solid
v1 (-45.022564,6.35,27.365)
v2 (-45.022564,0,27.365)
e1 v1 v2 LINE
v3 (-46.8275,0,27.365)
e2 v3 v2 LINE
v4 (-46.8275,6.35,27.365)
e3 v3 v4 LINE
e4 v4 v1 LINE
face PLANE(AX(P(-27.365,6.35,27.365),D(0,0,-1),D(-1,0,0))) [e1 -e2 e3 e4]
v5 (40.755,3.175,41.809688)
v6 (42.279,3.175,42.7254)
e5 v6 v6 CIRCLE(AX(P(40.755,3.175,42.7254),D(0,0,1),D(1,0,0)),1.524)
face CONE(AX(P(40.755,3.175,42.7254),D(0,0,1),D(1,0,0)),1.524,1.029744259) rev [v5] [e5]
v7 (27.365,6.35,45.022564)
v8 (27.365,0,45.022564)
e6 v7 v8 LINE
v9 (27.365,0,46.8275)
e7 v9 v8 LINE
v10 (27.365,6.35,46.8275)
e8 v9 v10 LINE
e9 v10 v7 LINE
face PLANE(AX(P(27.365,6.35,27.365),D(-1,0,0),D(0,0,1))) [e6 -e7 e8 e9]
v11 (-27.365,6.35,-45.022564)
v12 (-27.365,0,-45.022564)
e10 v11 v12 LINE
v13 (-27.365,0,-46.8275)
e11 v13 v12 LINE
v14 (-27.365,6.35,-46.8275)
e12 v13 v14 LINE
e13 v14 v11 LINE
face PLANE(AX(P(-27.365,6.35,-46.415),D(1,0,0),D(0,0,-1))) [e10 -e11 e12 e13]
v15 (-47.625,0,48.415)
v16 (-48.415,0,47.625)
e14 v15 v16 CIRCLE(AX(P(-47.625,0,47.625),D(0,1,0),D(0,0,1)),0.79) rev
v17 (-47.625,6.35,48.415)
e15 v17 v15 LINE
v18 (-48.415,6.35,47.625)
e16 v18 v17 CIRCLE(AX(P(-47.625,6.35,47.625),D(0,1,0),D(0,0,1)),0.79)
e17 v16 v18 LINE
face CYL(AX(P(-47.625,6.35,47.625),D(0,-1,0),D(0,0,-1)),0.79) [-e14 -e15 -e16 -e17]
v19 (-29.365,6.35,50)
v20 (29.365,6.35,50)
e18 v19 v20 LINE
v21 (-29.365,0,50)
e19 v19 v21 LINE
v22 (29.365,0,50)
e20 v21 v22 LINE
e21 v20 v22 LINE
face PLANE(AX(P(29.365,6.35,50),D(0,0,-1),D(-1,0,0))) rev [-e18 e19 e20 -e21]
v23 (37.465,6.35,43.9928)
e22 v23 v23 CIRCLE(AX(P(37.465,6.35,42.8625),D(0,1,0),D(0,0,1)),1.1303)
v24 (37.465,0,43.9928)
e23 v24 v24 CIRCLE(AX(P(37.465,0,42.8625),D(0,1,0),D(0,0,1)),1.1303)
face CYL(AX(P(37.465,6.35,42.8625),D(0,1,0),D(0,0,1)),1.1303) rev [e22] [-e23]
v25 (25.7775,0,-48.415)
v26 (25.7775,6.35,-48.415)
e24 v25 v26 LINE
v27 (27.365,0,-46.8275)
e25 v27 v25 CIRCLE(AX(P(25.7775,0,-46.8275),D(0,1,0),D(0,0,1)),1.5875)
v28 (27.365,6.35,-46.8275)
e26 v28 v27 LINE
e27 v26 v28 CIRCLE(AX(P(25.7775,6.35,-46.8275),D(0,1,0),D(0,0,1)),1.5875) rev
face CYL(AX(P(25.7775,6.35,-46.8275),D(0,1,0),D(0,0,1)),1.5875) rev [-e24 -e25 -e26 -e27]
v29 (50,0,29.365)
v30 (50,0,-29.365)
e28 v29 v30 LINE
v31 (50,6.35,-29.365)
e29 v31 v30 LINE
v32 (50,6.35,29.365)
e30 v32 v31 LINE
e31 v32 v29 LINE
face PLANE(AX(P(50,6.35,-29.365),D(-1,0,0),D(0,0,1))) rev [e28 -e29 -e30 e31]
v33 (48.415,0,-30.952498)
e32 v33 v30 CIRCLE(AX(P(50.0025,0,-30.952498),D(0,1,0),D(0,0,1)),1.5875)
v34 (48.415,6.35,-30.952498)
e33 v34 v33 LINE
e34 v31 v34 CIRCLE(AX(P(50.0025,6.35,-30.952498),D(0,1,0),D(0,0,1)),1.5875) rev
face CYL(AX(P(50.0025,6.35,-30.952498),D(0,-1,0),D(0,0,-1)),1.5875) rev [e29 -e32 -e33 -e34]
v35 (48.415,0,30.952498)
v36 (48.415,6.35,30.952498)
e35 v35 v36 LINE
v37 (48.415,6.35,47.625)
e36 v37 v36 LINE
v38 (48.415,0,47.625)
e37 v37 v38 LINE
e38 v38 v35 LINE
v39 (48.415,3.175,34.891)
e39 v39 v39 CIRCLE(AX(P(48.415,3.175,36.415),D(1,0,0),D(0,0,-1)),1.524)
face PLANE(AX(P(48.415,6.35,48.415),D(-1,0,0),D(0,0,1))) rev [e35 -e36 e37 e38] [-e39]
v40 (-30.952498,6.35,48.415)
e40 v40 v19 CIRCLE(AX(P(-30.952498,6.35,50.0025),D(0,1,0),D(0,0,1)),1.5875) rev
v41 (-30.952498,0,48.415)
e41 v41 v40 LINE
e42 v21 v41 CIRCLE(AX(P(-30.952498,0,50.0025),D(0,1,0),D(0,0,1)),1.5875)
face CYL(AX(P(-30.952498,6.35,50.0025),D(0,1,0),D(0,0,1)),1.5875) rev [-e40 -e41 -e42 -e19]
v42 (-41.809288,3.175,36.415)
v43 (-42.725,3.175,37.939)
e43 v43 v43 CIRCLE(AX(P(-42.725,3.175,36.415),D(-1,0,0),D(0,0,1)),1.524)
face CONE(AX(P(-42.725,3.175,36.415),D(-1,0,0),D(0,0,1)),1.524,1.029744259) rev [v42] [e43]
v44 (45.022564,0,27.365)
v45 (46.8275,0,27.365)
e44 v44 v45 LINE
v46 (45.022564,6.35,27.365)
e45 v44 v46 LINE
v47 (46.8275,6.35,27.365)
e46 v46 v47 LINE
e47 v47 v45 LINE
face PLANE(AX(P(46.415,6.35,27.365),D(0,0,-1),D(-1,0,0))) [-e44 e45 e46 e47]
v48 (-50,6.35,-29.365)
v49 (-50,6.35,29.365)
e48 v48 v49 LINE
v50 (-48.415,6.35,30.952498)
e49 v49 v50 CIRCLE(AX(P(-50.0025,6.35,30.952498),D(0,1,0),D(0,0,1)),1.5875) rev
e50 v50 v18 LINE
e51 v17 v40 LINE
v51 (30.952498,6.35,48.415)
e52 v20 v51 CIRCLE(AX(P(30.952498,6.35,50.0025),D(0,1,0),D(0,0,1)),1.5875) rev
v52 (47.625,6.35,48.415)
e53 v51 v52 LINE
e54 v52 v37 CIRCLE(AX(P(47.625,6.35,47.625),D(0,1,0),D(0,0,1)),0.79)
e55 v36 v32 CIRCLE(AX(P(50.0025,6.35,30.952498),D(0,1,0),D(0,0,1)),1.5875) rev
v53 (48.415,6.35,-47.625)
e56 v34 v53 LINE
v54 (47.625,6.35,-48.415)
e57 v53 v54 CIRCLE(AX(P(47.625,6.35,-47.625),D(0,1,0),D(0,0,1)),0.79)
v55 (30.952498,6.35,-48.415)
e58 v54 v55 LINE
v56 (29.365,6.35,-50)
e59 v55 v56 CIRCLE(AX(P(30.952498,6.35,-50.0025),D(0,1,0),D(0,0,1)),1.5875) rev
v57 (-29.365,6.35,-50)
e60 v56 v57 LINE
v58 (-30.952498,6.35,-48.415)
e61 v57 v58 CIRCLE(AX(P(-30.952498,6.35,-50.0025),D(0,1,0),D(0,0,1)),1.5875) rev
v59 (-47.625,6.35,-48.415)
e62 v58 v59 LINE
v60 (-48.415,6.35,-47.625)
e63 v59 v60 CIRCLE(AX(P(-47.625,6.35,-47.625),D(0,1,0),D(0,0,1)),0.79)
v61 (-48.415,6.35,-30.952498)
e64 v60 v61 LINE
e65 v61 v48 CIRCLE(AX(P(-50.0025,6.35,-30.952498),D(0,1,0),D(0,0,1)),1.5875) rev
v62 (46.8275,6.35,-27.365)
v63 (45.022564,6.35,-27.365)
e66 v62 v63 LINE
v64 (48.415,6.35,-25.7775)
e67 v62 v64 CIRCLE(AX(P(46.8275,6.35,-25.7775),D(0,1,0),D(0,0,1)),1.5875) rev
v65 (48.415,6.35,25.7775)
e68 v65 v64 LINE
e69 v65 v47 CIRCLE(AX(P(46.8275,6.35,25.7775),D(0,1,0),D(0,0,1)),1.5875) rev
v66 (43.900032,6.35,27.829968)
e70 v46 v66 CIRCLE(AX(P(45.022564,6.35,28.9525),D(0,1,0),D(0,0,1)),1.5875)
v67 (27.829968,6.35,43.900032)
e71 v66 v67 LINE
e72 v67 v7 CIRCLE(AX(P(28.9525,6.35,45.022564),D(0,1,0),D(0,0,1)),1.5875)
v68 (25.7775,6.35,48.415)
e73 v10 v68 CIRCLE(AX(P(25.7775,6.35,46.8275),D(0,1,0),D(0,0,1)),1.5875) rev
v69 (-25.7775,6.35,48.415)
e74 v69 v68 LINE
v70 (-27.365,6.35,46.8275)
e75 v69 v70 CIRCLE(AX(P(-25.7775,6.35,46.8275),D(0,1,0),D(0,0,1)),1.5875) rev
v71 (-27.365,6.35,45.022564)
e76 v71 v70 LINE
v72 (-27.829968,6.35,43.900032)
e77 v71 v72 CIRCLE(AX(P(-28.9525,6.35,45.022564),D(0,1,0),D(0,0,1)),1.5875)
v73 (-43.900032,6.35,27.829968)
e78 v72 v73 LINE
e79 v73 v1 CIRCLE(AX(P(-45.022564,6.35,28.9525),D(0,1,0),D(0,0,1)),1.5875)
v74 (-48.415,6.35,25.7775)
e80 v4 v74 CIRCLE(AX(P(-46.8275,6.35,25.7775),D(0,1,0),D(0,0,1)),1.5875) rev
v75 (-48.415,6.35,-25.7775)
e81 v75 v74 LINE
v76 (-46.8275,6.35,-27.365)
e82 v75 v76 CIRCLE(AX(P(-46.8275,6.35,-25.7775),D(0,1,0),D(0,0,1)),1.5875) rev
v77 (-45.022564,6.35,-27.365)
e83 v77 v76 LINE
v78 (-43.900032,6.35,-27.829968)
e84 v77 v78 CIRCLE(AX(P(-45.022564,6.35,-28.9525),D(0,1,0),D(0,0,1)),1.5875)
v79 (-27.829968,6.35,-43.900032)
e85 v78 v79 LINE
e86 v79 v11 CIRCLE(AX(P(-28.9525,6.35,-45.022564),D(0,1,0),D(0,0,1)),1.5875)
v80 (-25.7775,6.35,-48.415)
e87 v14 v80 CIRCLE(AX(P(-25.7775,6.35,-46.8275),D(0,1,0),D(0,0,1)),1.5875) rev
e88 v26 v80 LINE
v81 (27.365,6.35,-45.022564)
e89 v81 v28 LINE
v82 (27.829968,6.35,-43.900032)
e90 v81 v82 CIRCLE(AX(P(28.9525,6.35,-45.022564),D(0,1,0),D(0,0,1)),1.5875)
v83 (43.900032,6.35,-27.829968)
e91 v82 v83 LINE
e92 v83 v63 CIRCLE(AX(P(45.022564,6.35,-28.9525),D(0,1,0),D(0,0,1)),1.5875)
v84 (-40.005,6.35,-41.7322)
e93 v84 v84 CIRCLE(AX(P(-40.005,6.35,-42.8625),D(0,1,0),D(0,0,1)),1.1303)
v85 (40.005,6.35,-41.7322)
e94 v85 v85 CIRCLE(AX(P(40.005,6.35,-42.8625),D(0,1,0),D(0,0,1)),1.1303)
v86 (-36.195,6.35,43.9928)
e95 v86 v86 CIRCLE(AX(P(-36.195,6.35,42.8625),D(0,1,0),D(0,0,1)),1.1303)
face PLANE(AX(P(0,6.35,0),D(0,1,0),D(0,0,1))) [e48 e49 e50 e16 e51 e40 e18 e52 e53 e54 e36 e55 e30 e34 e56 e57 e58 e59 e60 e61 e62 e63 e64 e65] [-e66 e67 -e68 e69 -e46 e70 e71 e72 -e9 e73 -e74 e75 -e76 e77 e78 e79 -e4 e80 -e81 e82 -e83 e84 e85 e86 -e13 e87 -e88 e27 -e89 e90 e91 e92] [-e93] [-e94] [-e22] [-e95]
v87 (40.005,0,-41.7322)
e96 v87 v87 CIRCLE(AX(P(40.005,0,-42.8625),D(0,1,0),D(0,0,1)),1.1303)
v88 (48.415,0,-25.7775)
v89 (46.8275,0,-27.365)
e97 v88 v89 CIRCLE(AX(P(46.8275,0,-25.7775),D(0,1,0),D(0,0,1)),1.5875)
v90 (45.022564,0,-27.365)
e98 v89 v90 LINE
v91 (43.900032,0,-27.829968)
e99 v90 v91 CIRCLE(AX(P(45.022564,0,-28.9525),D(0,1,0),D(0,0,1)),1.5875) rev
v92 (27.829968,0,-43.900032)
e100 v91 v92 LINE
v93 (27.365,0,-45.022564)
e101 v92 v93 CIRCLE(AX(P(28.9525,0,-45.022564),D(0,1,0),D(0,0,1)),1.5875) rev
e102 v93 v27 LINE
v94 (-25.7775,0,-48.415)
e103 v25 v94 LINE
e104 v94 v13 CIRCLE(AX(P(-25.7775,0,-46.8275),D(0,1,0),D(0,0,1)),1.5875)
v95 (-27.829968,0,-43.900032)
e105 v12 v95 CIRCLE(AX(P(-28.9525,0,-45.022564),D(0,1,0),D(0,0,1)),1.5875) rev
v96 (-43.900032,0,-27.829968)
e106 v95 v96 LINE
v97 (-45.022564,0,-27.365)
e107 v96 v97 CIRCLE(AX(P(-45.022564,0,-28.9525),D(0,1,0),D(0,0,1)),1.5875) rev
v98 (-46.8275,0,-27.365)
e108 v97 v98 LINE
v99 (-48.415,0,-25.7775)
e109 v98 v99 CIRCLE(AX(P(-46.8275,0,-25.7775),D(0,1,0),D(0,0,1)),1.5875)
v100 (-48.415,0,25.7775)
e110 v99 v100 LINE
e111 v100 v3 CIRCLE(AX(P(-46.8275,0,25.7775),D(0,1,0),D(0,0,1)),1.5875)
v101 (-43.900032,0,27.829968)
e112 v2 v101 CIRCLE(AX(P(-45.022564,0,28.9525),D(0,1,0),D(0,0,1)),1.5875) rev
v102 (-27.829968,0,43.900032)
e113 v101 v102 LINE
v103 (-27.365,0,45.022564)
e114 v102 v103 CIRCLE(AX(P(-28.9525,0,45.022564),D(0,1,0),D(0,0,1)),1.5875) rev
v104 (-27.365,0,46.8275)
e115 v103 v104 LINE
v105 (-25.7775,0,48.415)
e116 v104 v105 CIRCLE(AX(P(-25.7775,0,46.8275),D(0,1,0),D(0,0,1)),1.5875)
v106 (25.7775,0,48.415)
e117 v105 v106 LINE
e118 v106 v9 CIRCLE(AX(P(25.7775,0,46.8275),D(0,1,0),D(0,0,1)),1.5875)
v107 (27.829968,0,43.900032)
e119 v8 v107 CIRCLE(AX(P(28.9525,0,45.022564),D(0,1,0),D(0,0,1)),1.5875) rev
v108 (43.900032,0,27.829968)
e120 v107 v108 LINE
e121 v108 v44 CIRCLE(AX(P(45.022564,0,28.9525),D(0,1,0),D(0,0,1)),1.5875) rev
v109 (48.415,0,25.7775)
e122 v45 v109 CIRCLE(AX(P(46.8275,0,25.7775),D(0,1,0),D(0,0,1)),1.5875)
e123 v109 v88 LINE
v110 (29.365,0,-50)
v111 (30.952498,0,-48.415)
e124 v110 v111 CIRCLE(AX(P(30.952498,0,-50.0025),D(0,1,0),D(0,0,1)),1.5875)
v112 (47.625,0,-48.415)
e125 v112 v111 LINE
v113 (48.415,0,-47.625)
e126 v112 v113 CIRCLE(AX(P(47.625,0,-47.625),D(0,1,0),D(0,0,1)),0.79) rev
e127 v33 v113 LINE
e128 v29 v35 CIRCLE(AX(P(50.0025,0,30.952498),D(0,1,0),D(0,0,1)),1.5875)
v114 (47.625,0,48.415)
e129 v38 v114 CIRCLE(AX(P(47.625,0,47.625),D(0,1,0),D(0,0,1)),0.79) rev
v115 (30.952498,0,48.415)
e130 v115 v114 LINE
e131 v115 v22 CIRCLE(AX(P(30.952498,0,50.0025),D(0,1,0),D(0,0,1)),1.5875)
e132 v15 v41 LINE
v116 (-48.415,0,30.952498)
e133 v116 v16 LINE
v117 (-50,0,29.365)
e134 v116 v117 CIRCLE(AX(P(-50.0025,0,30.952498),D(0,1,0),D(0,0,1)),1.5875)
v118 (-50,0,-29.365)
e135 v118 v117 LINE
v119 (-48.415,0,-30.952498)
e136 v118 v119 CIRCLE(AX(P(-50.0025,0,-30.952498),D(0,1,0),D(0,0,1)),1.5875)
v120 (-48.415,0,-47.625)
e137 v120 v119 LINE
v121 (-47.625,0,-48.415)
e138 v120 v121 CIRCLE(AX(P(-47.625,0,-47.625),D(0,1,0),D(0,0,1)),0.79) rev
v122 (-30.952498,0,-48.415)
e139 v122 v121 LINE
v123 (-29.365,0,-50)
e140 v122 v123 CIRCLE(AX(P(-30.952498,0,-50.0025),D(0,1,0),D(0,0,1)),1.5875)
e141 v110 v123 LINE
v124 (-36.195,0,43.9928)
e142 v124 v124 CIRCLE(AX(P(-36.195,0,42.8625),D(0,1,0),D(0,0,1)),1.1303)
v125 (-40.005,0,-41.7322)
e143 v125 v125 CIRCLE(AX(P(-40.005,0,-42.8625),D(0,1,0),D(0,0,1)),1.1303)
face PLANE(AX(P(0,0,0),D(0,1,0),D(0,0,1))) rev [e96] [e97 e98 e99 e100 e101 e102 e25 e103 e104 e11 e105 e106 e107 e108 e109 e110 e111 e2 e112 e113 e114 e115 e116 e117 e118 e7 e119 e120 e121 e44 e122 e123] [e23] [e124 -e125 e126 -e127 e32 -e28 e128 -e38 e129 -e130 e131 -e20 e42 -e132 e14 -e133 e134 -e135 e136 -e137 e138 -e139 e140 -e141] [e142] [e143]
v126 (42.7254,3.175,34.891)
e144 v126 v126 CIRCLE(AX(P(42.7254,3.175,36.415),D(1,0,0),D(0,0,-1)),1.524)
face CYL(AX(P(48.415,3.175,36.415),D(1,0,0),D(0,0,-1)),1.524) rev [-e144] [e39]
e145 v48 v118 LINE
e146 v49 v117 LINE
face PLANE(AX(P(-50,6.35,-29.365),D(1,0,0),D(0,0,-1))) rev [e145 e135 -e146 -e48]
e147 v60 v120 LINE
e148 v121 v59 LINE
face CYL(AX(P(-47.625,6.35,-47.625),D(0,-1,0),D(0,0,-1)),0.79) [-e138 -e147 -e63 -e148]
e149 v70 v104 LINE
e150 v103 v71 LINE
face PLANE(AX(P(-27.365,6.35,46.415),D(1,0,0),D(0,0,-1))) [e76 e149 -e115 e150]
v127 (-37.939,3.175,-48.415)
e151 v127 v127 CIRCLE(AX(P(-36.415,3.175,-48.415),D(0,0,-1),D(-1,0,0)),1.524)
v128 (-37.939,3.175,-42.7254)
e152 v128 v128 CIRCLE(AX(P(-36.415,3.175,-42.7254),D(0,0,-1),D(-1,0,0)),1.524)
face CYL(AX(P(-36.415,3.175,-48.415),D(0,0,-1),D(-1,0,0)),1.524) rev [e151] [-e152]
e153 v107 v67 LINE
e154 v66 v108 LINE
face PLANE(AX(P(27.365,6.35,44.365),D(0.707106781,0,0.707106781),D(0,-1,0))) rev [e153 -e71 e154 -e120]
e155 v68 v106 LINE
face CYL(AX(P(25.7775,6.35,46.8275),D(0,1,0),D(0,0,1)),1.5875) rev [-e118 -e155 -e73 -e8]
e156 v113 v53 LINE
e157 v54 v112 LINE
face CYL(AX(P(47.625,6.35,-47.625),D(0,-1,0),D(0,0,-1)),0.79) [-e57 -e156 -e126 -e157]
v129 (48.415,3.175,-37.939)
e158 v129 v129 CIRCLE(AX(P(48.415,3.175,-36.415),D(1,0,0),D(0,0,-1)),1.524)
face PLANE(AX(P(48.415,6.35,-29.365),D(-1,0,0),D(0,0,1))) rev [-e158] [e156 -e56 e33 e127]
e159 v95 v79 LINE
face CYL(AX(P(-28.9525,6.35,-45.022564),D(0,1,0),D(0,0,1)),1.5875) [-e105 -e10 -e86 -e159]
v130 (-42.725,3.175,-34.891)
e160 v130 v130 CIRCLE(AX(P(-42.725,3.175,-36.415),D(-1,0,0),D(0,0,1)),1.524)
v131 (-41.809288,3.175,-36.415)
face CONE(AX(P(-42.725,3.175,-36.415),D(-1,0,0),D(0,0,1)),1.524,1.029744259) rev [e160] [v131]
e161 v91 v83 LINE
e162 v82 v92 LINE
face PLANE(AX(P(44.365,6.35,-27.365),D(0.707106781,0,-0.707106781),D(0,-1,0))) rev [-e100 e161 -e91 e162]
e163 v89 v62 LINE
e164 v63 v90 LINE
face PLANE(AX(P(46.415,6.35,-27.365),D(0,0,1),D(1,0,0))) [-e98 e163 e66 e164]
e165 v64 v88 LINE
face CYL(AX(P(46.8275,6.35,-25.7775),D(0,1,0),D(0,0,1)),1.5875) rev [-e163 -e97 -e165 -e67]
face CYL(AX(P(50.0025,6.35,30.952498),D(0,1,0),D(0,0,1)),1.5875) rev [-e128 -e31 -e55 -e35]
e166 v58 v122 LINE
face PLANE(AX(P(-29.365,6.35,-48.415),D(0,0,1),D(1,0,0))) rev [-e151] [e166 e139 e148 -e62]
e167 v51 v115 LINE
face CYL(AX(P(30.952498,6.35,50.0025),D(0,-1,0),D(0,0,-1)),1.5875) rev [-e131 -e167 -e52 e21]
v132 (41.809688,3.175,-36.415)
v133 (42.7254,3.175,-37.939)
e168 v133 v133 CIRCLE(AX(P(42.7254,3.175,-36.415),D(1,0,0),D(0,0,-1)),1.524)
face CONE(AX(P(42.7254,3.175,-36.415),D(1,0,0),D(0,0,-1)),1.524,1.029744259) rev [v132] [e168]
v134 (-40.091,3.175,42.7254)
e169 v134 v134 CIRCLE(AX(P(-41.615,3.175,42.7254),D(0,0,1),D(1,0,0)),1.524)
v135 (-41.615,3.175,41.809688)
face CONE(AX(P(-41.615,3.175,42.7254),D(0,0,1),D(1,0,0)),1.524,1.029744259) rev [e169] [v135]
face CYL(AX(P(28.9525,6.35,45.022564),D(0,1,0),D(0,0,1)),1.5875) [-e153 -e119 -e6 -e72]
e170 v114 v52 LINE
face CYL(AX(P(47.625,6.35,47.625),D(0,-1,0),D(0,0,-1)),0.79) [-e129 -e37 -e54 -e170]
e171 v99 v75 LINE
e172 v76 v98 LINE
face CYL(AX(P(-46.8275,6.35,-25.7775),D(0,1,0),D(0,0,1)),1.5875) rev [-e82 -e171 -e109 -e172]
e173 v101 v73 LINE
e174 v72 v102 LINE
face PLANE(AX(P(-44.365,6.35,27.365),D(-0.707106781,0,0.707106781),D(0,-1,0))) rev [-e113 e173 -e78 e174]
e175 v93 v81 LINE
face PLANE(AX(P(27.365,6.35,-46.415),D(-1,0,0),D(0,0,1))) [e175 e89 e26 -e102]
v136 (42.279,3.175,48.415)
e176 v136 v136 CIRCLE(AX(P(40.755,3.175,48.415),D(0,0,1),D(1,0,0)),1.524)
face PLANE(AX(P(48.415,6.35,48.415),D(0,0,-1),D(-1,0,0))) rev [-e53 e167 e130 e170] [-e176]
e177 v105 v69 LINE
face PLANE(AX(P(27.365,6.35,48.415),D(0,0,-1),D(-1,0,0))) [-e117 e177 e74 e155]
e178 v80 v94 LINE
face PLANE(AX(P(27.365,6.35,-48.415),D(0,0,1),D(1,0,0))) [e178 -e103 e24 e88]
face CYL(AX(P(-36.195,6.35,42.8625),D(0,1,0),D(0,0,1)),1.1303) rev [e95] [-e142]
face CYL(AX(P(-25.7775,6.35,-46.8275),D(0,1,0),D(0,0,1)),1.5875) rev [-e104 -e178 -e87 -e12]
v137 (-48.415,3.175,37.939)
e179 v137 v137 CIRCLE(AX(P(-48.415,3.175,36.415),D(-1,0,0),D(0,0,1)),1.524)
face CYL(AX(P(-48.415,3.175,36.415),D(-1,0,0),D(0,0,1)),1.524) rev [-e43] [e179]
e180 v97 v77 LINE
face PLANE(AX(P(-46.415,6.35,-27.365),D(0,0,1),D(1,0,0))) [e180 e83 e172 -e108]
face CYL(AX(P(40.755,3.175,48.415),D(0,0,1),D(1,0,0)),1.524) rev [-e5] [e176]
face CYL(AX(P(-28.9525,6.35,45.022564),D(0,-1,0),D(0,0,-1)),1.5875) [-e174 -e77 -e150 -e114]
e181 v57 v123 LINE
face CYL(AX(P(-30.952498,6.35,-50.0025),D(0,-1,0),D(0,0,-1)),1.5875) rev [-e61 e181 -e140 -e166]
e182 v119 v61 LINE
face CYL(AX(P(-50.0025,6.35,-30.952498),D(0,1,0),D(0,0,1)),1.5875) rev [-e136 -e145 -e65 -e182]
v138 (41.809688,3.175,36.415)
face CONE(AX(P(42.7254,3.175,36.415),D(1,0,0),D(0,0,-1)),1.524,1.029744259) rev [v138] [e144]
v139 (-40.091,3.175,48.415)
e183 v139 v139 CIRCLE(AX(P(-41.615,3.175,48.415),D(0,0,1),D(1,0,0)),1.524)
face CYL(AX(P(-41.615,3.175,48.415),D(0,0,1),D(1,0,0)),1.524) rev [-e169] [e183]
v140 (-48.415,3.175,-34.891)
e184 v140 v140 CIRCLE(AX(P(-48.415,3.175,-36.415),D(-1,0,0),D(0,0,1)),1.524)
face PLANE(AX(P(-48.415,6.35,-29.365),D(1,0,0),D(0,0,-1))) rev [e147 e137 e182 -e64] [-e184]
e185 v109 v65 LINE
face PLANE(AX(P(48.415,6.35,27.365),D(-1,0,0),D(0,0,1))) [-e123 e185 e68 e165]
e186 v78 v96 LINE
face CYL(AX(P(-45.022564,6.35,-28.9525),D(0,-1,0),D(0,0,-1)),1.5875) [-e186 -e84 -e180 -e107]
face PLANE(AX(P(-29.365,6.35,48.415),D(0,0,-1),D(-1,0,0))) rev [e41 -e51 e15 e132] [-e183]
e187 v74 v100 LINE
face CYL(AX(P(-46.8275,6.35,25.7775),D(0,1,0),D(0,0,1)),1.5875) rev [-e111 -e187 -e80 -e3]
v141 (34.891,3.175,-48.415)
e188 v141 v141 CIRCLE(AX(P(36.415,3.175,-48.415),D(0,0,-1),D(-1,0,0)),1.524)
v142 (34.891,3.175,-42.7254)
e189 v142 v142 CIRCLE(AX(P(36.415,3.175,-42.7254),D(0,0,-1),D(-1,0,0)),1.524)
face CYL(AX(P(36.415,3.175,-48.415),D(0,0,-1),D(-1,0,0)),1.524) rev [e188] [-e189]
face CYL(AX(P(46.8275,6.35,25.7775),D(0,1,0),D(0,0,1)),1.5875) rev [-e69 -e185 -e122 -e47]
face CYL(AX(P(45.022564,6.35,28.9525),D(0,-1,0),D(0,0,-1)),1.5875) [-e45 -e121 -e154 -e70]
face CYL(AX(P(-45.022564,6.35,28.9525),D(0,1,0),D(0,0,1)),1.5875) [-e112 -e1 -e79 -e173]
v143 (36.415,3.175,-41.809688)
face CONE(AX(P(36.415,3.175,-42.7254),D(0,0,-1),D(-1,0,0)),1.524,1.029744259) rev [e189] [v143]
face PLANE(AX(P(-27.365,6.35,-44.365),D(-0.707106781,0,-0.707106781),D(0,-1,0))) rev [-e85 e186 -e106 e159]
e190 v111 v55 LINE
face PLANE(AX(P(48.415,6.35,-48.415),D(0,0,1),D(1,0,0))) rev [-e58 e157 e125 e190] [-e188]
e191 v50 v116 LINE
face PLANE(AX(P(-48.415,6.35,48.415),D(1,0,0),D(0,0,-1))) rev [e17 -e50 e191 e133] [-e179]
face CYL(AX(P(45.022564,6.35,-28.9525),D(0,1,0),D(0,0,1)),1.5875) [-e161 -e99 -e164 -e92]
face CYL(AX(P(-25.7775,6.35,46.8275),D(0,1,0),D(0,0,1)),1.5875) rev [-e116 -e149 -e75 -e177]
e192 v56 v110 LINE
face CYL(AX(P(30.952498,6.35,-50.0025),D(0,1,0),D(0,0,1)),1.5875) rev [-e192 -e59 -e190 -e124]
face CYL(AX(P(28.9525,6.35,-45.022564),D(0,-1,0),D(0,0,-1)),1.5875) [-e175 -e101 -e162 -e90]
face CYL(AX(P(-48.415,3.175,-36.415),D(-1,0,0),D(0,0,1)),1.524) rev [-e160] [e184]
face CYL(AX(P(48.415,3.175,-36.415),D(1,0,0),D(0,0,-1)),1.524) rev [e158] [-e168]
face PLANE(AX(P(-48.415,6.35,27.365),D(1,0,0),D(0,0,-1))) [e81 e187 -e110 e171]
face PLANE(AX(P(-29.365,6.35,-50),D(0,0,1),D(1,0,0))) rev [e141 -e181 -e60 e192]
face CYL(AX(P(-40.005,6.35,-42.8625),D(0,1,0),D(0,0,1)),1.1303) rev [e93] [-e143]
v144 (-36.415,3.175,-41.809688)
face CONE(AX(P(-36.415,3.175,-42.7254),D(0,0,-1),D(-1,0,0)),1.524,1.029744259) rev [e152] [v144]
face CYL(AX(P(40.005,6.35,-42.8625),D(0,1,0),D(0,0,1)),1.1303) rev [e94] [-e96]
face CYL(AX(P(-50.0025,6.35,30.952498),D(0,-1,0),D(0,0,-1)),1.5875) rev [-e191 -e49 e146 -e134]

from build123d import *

# Parameters (mm, degrees)
BOSS_EXTRUDE2_DEPTH               = 6.35
FILLET7_R                         = 1.5875
FILLET8_R                         = 0.79
TAP_DRILL_FOR_4_HELICOIL5_D       = 3.048
TAP_DRILL_FOR_4_HELICOIL5_DEPTH   = 5.6896
TAP_DRILL_FOR_4_HELICOIL5_TIP     = 0.915711583
TAP_DRILL_FOR_4_HELICOIL5_2_D     = 3.048
TAP_DRILL_FOR_4_HELICOIL5_2_DEPTH = 5.6896
TAP_DRILL_FOR_4_HELICOIL5_2_TIP   = 0.915711583
FILLET10_R                        = 1.5875
TAP_DRILL_FOR_4_40_TAP1_D         = 2.2606
TAP_DRILL_FOR_4_40_TAP1_DEPTH     = 8.65
TAP_DRILL_FOR_4_40_TAP1_TIP       = 0.679152758
CHAMFER1_SIZE                     = 17
FILLET11_R                        = 1.5875
TAP_DRILL_FOR_4_HELICOIL6_D       = 3.048
TAP_DRILL_FOR_4_HELICOIL6_DEPTH   = 5.6896
TAP_DRILL_FOR_4_HELICOIL6_TIP     = 0.915711583
TAP_DRILL_FOR_4_HELICOIL7_D       = 3.048
TAP_DRILL_FOR_4_HELICOIL7_DEPTH   = 5.69
TAP_DRILL_FOR_4_HELICOIL7_TIP     = 0.915711583


with BuildPart() as part:
    # Sketch10 → Boss-Extrude2 (new body)
    with BuildSketch(Plane(origin=(0, 0, 0), x_dir=(1, 0, 0), z_dir=(0, 1, 0))):
        Polygon((48.415, -48.415), (29.365, -48.415), (29.365, -50), (-29.365, -50), (-29.365, -48.415), (-48.415, -48.415), (-48.415, -29.365), (-50, -29.365), (-50, 29.365), (-48.415, 29.365), (-48.415, 48.415), (-29.365, 48.415), (-29.365, 50), (29.365, 50), (29.365, 48.415), (48.415, 48.415), (48.415, 29.365), (50, 29.365), (50, -29.365), (48.415, -29.365), align=None)
        Polygon((27.365, 48.415), (-27.365, 48.415), (-27.365, 46.415), (-27.365, 27.365), (-46.415, 27.365), (-48.415, 27.365), (-48.415, -27.365), (-46.415, -27.365), (-27.365, -27.365), (-27.365, -46.415), (-27.365, -48.415), (27.365, -48.415), (27.365, -46.415), (27.365, -27.365), (46.415, -27.365), (48.415, -27.365), (48.415, 27.365), (46.415, 27.365), (27.365, 27.365), (27.365, 46.415), align=None, mode=Mode.SUBTRACT)
    extrude(amount=BOSS_EXTRUDE2_DEPTH)

    # Fillet7
    # the kernel refuses this fillet: 1.5875 mm, written as the material it adds along each edge
    with BuildSketch(Plane(origin=(-48.415, 0, 29.365), x_dir=(-1, 0, 0), z_dir=(0, 1, 0))) as fillet7_piece_1_section:
        with BuildLine():
            CenterArc((FILLET7_R, FILLET7_R), FILLET7_R, 180, 90)
            Line((0, FILLET7_R), (0, 0))
            Line((0, 0), (FILLET7_R, 0))
        make_face()
    fillet7_piece_1 = extrude(amount=6.35, mode=Mode.PRIVATE)
    fillet7_piece_1 = split(fillet7_piece_1, bisect_by=Plane(origin=(-50, 3.175, 29.724448602), z_dir=(1, 0, 0)), keep=Keep.TOP, mode=Mode.PRIVATE)
    add(fillet7_piece_1)
    with BuildSketch(Plane(origin=(-29.365, 0, 48.415), x_dir=(-1, 0, 0), z_dir=(0, 1, 0))) as fillet7_piece_2_section:
        with BuildLine():
            CenterArc((FILLET7_R, FILLET7_R), FILLET7_R, 180, 90)
            Line((0, FILLET7_R), (0, 0))
            Line((0, 0), (FILLET7_R, 0))
        make_face()
    fillet7_piece_2 = extrude(amount=6.35, mode=Mode.PRIVATE)
    fillet7_piece_2 = split(fillet7_piece_2, bisect_by=Plane(origin=(-29.724448602, 3.175, 50), z_dir=(0, 0, -1)), keep=Keep.TOP, mode=Mode.PRIVATE)
    add(fillet7_piece_2)
    with BuildSketch(Plane(origin=(29.365, 0, 48.415), x_dir=(1, 0, 0), z_dir=(0, 1, 0))) as fillet7_piece_3_section:
        with BuildLine():
            CenterArc((FILLET7_R, -FILLET7_R), FILLET7_R, 90, 90)
            Line((0, -FILLET7_R), (0, 0))
            Line((0, 0), (FILLET7_R, 0))
        make_face()
    fillet7_piece_3 = extrude(amount=6.35, mode=Mode.PRIVATE)
    fillet7_piece_3 = split(fillet7_piece_3, bisect_by=Plane(origin=(29.724448602, 3.175, 50), z_dir=(0, 0, -1)), keep=Keep.TOP, mode=Mode.PRIVATE)
    add(fillet7_piece_3)
    with BuildSketch(Plane(origin=(48.415, 0, 29.365), x_dir=(1, 0, 0), z_dir=(0, 1, 0))) as fillet7_piece_4_section:
        with BuildLine():
            CenterArc((FILLET7_R, -FILLET7_R), FILLET7_R, 90, 90)
            Line((0, -FILLET7_R), (0, 0))
            Line((0, 0), (FILLET7_R, 0))
        make_face()
    fillet7_piece_4 = extrude(amount=6.35, mode=Mode.PRIVATE)
    fillet7_piece_4 = split(fillet7_piece_4, bisect_by=Plane(origin=(50, 3.175, 29.724448602), z_dir=(-1, 0, 0)), keep=Keep.TOP, mode=Mode.PRIVATE)
    add(fillet7_piece_4)
    with BuildSketch(Plane(origin=(48.415, 0, -29.365), x_dir=(1, 0, 0), z_dir=(0, 1, 0))) as fillet7_piece_5_section:
        with BuildLine():
            CenterArc((FILLET7_R, FILLET7_R), FILLET7_R, 180, 90)
            Line((0, FILLET7_R), (0, 0))
            Line((0, 0), (FILLET7_R, 0))
        make_face()
    fillet7_piece_5 = extrude(amount=6.35, mode=Mode.PRIVATE)
    fillet7_piece_5 = split(fillet7_piece_5, bisect_by=Plane(origin=(50, 3.175, -29.724448602), z_dir=(-1, 0, 0)), keep=Keep.TOP, mode=Mode.PRIVATE)
    add(fillet7_piece_5)
    with BuildSketch(Plane(origin=(29.365, 0, -48.415), x_dir=(1, 0, 0), z_dir=(0, 1, 0))) as fillet7_piece_6_section:
        with BuildLine():
            CenterArc((FILLET7_R, FILLET7_R), FILLET7_R, 180, 90)
            Line((0, FILLET7_R), (0, 0))
            Line((0, 0), (FILLET7_R, 0))
        make_face()
    fillet7_piece_6 = extrude(amount=6.35, mode=Mode.PRIVATE)
    fillet7_piece_6 = split(fillet7_piece_6, bisect_by=Plane(origin=(29.724448602, 3.175, -50), z_dir=(0, 0, 1)), keep=Keep.TOP, mode=Mode.PRIVATE)
    add(fillet7_piece_6)
    with BuildSketch(Plane(origin=(-48.415, 0, -29.365), x_dir=(0, 0, -1), z_dir=(0, 1, 0))) as fillet7_piece_7_section:
        with BuildLine():
            CenterArc((FILLET7_R, FILLET7_R), FILLET7_R, 180, 90)
            Line((0, FILLET7_R), (0, 0))
            Line((0, 0), (FILLET7_R, 0))
        make_face()
    fillet7_piece_7 = extrude(amount=6.35, mode=Mode.PRIVATE)
    fillet7_piece_7 = split(fillet7_piece_7, bisect_by=Plane(origin=(-50, 3.175, -29.724448602), z_dir=(1, 0, 0)), keep=Keep.TOP, mode=Mode.PRIVATE)
    add(fillet7_piece_7)
    with BuildSketch(Plane(origin=(-29.365, 0, -48.415), x_dir=(0, 0, -1), z_dir=(0, 1, 0))) as fillet7_piece_8_section:
        with BuildLine():
            CenterArc((FILLET7_R, FILLET7_R), FILLET7_R, 180, 90)
            Line((0, FILLET7_R), (0, 0))
            Line((0, 0), (FILLET7_R, 0))
        make_face()
    fillet7_piece_8 = extrude(amount=6.35, mode=Mode.PRIVATE)
    fillet7_piece_8 = split(fillet7_piece_8, bisect_by=Plane(origin=(-29.724448602, 3.175, -50), z_dir=(0, 0, 1)), keep=Keep.TOP, mode=Mode.PRIVATE)
    add(fillet7_piece_8)

    # Fillet8
    fillet8_edges = [part.edges().sort_by_distance(p)[0] for p in [
        (-48.415, 3.175, -48.415),
        (48.415, 3.175, -48.415),
        (48.415, 3.175, 48.415),
        (-48.415, 3.175, 48.415),
    ]]
    fillet(fillet8_edges, radius=FILLET8_R)

    # Tap Drill for _4 Helicoil5
    with Locations(Plane(origin=(48.415, 0, 0), x_dir=(0, 0, -1), z_dir=(1, 0, 0))):
        with Locations((-36.415, 3.175), (36.415, 3.175)):
            Hole(TAP_DRILL_FOR_4_HELICOIL5_D / 2, depth=TAP_DRILL_FOR_4_HELICOIL5_DEPTH)
            with Locations((0, 0, -(TAP_DRILL_FOR_4_HELICOIL5_DEPTH + TAP_DRILL_FOR_4_HELICOIL5_TIP / 2))):  # 118° drill point
                Cone(0, TAP_DRILL_FOR_4_HELICOIL5_D / 2, TAP_DRILL_FOR_4_HELICOIL5_TIP, mode=Mode.SUBTRACT)

    # Tap Drill for _4 Helicoil5 2
    with Locations(Plane.XY.offset(48.415)):
        with Locations((40.755, 3.175), (-41.615, 3.175)):
            Hole(TAP_DRILL_FOR_4_HELICOIL5_2_D / 2, depth=TAP_DRILL_FOR_4_HELICOIL5_2_DEPTH)
            with Locations((0, 0, -(TAP_DRILL_FOR_4_HELICOIL5_2_DEPTH + TAP_DRILL_FOR_4_HELICOIL5_2_TIP / 2))):  # 118° drill point
                Cone(0, TAP_DRILL_FOR_4_HELICOIL5_2_D / 2, TAP_DRILL_FOR_4_HELICOIL5_2_TIP, mode=Mode.SUBTRACT)

    # Fillet10
    fillet10_edges = [part.edges().sort_by_distance(p)[0] for p in [
        (27.365, 3.175, -48.415),
        (-27.365, 3.175, -48.415),
        (-48.415, 3.175, -27.365),
        (-48.415, 3.175, 27.365),
        (-27.365, 3.175, 48.415),
        (27.365, 3.175, 48.415),
        (48.415, 3.175, 27.365),
        (48.415, 3.175, -27.365),
    ]]
    fillet(fillet10_edges, radius=FILLET10_R)

    # Tap Drill for #4-40 Tap1
    with Locations(Plane(origin=(0, 6.35, 0), x_dir=(1, 0, 0), z_dir=(0, 1, 0))):
        with Locations((37.465, -42.8625), (40.005, 42.8625), (-40.005, 42.8625), (-36.195, -42.8625)):
            Hole(TAP_DRILL_FOR_4_40_TAP1_D / 2, depth=TAP_DRILL_FOR_4_40_TAP1_DEPTH)
            with Locations((0, 0, -(TAP_DRILL_FOR_4_40_TAP1_DEPTH + TAP_DRILL_FOR_4_40_TAP1_TIP / 2))):  # 118° drill point
                Cone(0, TAP_DRILL_FOR_4_40_TAP1_D / 2, TAP_DRILL_FOR_4_40_TAP1_TIP, mode=Mode.SUBTRACT)

    # Chamfer1
    chamfer1_edges = [part.edges().sort_by_distance(p)[0] for p in [
        (27.365, 3.175, -27.365),
        (-27.365, 3.175, -27.365),
        (-27.365, 3.175, 27.365),
        (27.365, 3.175, 27.365),
    ]]
    chamfer(chamfer1_edges, length=CHAMFER1_SIZE)

    # Fillet11
    fillet11_edges = [part.edges().sort_by_distance(p)[0] for p in [
        (-44.365, 3.175, 27.365),
        (-27.365, 3.175, 44.365),
        (27.365, 3.175, 44.365),
        (44.365, 3.175, 27.365),
        (-27.365, 3.175, -44.365),
        (-44.365, 3.175, -27.365),
        (44.365, 3.175, -27.365),
        (27.365, 3.175, -44.365),
    ]]
    fillet(fillet11_edges, radius=FILLET11_R)

    # Tap Drill for #4 Helicoil6
    with Locations(Plane(origin=(0, 0, -48.415), x_dir=(-1, 0, 0), z_dir=(0, 0, -1))):
        with Locations((36.415, 3.175), (-36.415, 3.175)):
            Hole(TAP_DRILL_FOR_4_HELICOIL6_D / 2, depth=TAP_DRILL_FOR_4_HELICOIL6_DEPTH)
            with Locations((0, 0, -(TAP_DRILL_FOR_4_HELICOIL6_DEPTH + TAP_DRILL_FOR_4_HELICOIL6_TIP / 2))):  # 118° drill point
                Cone(0, TAP_DRILL_FOR_4_HELICOIL6_D / 2, TAP_DRILL_FOR_4_HELICOIL6_TIP, mode=Mode.SUBTRACT)

    # Tap Drill for #4 Helicoil7
    with Locations(Plane.ZY.offset(48.415)):
        with Locations((-36.415, 3.175), (36.415, 3.175)):
            Hole(TAP_DRILL_FOR_4_HELICOIL7_D / 2, depth=TAP_DRILL_FOR_4_HELICOIL7_DEPTH)
            with Locations((0, 0, -(TAP_DRILL_FOR_4_HELICOIL7_DEPTH + TAP_DRILL_FOR_4_HELICOIL7_TIP / 2))):  # 118° drill point
                Cone(0, TAP_DRILL_FOR_4_HELICOIL7_D / 2, TAP_DRILL_FOR_4_HELICOIL7_TIP, mode=Mode.SUBTRACT)


solid = part.part
